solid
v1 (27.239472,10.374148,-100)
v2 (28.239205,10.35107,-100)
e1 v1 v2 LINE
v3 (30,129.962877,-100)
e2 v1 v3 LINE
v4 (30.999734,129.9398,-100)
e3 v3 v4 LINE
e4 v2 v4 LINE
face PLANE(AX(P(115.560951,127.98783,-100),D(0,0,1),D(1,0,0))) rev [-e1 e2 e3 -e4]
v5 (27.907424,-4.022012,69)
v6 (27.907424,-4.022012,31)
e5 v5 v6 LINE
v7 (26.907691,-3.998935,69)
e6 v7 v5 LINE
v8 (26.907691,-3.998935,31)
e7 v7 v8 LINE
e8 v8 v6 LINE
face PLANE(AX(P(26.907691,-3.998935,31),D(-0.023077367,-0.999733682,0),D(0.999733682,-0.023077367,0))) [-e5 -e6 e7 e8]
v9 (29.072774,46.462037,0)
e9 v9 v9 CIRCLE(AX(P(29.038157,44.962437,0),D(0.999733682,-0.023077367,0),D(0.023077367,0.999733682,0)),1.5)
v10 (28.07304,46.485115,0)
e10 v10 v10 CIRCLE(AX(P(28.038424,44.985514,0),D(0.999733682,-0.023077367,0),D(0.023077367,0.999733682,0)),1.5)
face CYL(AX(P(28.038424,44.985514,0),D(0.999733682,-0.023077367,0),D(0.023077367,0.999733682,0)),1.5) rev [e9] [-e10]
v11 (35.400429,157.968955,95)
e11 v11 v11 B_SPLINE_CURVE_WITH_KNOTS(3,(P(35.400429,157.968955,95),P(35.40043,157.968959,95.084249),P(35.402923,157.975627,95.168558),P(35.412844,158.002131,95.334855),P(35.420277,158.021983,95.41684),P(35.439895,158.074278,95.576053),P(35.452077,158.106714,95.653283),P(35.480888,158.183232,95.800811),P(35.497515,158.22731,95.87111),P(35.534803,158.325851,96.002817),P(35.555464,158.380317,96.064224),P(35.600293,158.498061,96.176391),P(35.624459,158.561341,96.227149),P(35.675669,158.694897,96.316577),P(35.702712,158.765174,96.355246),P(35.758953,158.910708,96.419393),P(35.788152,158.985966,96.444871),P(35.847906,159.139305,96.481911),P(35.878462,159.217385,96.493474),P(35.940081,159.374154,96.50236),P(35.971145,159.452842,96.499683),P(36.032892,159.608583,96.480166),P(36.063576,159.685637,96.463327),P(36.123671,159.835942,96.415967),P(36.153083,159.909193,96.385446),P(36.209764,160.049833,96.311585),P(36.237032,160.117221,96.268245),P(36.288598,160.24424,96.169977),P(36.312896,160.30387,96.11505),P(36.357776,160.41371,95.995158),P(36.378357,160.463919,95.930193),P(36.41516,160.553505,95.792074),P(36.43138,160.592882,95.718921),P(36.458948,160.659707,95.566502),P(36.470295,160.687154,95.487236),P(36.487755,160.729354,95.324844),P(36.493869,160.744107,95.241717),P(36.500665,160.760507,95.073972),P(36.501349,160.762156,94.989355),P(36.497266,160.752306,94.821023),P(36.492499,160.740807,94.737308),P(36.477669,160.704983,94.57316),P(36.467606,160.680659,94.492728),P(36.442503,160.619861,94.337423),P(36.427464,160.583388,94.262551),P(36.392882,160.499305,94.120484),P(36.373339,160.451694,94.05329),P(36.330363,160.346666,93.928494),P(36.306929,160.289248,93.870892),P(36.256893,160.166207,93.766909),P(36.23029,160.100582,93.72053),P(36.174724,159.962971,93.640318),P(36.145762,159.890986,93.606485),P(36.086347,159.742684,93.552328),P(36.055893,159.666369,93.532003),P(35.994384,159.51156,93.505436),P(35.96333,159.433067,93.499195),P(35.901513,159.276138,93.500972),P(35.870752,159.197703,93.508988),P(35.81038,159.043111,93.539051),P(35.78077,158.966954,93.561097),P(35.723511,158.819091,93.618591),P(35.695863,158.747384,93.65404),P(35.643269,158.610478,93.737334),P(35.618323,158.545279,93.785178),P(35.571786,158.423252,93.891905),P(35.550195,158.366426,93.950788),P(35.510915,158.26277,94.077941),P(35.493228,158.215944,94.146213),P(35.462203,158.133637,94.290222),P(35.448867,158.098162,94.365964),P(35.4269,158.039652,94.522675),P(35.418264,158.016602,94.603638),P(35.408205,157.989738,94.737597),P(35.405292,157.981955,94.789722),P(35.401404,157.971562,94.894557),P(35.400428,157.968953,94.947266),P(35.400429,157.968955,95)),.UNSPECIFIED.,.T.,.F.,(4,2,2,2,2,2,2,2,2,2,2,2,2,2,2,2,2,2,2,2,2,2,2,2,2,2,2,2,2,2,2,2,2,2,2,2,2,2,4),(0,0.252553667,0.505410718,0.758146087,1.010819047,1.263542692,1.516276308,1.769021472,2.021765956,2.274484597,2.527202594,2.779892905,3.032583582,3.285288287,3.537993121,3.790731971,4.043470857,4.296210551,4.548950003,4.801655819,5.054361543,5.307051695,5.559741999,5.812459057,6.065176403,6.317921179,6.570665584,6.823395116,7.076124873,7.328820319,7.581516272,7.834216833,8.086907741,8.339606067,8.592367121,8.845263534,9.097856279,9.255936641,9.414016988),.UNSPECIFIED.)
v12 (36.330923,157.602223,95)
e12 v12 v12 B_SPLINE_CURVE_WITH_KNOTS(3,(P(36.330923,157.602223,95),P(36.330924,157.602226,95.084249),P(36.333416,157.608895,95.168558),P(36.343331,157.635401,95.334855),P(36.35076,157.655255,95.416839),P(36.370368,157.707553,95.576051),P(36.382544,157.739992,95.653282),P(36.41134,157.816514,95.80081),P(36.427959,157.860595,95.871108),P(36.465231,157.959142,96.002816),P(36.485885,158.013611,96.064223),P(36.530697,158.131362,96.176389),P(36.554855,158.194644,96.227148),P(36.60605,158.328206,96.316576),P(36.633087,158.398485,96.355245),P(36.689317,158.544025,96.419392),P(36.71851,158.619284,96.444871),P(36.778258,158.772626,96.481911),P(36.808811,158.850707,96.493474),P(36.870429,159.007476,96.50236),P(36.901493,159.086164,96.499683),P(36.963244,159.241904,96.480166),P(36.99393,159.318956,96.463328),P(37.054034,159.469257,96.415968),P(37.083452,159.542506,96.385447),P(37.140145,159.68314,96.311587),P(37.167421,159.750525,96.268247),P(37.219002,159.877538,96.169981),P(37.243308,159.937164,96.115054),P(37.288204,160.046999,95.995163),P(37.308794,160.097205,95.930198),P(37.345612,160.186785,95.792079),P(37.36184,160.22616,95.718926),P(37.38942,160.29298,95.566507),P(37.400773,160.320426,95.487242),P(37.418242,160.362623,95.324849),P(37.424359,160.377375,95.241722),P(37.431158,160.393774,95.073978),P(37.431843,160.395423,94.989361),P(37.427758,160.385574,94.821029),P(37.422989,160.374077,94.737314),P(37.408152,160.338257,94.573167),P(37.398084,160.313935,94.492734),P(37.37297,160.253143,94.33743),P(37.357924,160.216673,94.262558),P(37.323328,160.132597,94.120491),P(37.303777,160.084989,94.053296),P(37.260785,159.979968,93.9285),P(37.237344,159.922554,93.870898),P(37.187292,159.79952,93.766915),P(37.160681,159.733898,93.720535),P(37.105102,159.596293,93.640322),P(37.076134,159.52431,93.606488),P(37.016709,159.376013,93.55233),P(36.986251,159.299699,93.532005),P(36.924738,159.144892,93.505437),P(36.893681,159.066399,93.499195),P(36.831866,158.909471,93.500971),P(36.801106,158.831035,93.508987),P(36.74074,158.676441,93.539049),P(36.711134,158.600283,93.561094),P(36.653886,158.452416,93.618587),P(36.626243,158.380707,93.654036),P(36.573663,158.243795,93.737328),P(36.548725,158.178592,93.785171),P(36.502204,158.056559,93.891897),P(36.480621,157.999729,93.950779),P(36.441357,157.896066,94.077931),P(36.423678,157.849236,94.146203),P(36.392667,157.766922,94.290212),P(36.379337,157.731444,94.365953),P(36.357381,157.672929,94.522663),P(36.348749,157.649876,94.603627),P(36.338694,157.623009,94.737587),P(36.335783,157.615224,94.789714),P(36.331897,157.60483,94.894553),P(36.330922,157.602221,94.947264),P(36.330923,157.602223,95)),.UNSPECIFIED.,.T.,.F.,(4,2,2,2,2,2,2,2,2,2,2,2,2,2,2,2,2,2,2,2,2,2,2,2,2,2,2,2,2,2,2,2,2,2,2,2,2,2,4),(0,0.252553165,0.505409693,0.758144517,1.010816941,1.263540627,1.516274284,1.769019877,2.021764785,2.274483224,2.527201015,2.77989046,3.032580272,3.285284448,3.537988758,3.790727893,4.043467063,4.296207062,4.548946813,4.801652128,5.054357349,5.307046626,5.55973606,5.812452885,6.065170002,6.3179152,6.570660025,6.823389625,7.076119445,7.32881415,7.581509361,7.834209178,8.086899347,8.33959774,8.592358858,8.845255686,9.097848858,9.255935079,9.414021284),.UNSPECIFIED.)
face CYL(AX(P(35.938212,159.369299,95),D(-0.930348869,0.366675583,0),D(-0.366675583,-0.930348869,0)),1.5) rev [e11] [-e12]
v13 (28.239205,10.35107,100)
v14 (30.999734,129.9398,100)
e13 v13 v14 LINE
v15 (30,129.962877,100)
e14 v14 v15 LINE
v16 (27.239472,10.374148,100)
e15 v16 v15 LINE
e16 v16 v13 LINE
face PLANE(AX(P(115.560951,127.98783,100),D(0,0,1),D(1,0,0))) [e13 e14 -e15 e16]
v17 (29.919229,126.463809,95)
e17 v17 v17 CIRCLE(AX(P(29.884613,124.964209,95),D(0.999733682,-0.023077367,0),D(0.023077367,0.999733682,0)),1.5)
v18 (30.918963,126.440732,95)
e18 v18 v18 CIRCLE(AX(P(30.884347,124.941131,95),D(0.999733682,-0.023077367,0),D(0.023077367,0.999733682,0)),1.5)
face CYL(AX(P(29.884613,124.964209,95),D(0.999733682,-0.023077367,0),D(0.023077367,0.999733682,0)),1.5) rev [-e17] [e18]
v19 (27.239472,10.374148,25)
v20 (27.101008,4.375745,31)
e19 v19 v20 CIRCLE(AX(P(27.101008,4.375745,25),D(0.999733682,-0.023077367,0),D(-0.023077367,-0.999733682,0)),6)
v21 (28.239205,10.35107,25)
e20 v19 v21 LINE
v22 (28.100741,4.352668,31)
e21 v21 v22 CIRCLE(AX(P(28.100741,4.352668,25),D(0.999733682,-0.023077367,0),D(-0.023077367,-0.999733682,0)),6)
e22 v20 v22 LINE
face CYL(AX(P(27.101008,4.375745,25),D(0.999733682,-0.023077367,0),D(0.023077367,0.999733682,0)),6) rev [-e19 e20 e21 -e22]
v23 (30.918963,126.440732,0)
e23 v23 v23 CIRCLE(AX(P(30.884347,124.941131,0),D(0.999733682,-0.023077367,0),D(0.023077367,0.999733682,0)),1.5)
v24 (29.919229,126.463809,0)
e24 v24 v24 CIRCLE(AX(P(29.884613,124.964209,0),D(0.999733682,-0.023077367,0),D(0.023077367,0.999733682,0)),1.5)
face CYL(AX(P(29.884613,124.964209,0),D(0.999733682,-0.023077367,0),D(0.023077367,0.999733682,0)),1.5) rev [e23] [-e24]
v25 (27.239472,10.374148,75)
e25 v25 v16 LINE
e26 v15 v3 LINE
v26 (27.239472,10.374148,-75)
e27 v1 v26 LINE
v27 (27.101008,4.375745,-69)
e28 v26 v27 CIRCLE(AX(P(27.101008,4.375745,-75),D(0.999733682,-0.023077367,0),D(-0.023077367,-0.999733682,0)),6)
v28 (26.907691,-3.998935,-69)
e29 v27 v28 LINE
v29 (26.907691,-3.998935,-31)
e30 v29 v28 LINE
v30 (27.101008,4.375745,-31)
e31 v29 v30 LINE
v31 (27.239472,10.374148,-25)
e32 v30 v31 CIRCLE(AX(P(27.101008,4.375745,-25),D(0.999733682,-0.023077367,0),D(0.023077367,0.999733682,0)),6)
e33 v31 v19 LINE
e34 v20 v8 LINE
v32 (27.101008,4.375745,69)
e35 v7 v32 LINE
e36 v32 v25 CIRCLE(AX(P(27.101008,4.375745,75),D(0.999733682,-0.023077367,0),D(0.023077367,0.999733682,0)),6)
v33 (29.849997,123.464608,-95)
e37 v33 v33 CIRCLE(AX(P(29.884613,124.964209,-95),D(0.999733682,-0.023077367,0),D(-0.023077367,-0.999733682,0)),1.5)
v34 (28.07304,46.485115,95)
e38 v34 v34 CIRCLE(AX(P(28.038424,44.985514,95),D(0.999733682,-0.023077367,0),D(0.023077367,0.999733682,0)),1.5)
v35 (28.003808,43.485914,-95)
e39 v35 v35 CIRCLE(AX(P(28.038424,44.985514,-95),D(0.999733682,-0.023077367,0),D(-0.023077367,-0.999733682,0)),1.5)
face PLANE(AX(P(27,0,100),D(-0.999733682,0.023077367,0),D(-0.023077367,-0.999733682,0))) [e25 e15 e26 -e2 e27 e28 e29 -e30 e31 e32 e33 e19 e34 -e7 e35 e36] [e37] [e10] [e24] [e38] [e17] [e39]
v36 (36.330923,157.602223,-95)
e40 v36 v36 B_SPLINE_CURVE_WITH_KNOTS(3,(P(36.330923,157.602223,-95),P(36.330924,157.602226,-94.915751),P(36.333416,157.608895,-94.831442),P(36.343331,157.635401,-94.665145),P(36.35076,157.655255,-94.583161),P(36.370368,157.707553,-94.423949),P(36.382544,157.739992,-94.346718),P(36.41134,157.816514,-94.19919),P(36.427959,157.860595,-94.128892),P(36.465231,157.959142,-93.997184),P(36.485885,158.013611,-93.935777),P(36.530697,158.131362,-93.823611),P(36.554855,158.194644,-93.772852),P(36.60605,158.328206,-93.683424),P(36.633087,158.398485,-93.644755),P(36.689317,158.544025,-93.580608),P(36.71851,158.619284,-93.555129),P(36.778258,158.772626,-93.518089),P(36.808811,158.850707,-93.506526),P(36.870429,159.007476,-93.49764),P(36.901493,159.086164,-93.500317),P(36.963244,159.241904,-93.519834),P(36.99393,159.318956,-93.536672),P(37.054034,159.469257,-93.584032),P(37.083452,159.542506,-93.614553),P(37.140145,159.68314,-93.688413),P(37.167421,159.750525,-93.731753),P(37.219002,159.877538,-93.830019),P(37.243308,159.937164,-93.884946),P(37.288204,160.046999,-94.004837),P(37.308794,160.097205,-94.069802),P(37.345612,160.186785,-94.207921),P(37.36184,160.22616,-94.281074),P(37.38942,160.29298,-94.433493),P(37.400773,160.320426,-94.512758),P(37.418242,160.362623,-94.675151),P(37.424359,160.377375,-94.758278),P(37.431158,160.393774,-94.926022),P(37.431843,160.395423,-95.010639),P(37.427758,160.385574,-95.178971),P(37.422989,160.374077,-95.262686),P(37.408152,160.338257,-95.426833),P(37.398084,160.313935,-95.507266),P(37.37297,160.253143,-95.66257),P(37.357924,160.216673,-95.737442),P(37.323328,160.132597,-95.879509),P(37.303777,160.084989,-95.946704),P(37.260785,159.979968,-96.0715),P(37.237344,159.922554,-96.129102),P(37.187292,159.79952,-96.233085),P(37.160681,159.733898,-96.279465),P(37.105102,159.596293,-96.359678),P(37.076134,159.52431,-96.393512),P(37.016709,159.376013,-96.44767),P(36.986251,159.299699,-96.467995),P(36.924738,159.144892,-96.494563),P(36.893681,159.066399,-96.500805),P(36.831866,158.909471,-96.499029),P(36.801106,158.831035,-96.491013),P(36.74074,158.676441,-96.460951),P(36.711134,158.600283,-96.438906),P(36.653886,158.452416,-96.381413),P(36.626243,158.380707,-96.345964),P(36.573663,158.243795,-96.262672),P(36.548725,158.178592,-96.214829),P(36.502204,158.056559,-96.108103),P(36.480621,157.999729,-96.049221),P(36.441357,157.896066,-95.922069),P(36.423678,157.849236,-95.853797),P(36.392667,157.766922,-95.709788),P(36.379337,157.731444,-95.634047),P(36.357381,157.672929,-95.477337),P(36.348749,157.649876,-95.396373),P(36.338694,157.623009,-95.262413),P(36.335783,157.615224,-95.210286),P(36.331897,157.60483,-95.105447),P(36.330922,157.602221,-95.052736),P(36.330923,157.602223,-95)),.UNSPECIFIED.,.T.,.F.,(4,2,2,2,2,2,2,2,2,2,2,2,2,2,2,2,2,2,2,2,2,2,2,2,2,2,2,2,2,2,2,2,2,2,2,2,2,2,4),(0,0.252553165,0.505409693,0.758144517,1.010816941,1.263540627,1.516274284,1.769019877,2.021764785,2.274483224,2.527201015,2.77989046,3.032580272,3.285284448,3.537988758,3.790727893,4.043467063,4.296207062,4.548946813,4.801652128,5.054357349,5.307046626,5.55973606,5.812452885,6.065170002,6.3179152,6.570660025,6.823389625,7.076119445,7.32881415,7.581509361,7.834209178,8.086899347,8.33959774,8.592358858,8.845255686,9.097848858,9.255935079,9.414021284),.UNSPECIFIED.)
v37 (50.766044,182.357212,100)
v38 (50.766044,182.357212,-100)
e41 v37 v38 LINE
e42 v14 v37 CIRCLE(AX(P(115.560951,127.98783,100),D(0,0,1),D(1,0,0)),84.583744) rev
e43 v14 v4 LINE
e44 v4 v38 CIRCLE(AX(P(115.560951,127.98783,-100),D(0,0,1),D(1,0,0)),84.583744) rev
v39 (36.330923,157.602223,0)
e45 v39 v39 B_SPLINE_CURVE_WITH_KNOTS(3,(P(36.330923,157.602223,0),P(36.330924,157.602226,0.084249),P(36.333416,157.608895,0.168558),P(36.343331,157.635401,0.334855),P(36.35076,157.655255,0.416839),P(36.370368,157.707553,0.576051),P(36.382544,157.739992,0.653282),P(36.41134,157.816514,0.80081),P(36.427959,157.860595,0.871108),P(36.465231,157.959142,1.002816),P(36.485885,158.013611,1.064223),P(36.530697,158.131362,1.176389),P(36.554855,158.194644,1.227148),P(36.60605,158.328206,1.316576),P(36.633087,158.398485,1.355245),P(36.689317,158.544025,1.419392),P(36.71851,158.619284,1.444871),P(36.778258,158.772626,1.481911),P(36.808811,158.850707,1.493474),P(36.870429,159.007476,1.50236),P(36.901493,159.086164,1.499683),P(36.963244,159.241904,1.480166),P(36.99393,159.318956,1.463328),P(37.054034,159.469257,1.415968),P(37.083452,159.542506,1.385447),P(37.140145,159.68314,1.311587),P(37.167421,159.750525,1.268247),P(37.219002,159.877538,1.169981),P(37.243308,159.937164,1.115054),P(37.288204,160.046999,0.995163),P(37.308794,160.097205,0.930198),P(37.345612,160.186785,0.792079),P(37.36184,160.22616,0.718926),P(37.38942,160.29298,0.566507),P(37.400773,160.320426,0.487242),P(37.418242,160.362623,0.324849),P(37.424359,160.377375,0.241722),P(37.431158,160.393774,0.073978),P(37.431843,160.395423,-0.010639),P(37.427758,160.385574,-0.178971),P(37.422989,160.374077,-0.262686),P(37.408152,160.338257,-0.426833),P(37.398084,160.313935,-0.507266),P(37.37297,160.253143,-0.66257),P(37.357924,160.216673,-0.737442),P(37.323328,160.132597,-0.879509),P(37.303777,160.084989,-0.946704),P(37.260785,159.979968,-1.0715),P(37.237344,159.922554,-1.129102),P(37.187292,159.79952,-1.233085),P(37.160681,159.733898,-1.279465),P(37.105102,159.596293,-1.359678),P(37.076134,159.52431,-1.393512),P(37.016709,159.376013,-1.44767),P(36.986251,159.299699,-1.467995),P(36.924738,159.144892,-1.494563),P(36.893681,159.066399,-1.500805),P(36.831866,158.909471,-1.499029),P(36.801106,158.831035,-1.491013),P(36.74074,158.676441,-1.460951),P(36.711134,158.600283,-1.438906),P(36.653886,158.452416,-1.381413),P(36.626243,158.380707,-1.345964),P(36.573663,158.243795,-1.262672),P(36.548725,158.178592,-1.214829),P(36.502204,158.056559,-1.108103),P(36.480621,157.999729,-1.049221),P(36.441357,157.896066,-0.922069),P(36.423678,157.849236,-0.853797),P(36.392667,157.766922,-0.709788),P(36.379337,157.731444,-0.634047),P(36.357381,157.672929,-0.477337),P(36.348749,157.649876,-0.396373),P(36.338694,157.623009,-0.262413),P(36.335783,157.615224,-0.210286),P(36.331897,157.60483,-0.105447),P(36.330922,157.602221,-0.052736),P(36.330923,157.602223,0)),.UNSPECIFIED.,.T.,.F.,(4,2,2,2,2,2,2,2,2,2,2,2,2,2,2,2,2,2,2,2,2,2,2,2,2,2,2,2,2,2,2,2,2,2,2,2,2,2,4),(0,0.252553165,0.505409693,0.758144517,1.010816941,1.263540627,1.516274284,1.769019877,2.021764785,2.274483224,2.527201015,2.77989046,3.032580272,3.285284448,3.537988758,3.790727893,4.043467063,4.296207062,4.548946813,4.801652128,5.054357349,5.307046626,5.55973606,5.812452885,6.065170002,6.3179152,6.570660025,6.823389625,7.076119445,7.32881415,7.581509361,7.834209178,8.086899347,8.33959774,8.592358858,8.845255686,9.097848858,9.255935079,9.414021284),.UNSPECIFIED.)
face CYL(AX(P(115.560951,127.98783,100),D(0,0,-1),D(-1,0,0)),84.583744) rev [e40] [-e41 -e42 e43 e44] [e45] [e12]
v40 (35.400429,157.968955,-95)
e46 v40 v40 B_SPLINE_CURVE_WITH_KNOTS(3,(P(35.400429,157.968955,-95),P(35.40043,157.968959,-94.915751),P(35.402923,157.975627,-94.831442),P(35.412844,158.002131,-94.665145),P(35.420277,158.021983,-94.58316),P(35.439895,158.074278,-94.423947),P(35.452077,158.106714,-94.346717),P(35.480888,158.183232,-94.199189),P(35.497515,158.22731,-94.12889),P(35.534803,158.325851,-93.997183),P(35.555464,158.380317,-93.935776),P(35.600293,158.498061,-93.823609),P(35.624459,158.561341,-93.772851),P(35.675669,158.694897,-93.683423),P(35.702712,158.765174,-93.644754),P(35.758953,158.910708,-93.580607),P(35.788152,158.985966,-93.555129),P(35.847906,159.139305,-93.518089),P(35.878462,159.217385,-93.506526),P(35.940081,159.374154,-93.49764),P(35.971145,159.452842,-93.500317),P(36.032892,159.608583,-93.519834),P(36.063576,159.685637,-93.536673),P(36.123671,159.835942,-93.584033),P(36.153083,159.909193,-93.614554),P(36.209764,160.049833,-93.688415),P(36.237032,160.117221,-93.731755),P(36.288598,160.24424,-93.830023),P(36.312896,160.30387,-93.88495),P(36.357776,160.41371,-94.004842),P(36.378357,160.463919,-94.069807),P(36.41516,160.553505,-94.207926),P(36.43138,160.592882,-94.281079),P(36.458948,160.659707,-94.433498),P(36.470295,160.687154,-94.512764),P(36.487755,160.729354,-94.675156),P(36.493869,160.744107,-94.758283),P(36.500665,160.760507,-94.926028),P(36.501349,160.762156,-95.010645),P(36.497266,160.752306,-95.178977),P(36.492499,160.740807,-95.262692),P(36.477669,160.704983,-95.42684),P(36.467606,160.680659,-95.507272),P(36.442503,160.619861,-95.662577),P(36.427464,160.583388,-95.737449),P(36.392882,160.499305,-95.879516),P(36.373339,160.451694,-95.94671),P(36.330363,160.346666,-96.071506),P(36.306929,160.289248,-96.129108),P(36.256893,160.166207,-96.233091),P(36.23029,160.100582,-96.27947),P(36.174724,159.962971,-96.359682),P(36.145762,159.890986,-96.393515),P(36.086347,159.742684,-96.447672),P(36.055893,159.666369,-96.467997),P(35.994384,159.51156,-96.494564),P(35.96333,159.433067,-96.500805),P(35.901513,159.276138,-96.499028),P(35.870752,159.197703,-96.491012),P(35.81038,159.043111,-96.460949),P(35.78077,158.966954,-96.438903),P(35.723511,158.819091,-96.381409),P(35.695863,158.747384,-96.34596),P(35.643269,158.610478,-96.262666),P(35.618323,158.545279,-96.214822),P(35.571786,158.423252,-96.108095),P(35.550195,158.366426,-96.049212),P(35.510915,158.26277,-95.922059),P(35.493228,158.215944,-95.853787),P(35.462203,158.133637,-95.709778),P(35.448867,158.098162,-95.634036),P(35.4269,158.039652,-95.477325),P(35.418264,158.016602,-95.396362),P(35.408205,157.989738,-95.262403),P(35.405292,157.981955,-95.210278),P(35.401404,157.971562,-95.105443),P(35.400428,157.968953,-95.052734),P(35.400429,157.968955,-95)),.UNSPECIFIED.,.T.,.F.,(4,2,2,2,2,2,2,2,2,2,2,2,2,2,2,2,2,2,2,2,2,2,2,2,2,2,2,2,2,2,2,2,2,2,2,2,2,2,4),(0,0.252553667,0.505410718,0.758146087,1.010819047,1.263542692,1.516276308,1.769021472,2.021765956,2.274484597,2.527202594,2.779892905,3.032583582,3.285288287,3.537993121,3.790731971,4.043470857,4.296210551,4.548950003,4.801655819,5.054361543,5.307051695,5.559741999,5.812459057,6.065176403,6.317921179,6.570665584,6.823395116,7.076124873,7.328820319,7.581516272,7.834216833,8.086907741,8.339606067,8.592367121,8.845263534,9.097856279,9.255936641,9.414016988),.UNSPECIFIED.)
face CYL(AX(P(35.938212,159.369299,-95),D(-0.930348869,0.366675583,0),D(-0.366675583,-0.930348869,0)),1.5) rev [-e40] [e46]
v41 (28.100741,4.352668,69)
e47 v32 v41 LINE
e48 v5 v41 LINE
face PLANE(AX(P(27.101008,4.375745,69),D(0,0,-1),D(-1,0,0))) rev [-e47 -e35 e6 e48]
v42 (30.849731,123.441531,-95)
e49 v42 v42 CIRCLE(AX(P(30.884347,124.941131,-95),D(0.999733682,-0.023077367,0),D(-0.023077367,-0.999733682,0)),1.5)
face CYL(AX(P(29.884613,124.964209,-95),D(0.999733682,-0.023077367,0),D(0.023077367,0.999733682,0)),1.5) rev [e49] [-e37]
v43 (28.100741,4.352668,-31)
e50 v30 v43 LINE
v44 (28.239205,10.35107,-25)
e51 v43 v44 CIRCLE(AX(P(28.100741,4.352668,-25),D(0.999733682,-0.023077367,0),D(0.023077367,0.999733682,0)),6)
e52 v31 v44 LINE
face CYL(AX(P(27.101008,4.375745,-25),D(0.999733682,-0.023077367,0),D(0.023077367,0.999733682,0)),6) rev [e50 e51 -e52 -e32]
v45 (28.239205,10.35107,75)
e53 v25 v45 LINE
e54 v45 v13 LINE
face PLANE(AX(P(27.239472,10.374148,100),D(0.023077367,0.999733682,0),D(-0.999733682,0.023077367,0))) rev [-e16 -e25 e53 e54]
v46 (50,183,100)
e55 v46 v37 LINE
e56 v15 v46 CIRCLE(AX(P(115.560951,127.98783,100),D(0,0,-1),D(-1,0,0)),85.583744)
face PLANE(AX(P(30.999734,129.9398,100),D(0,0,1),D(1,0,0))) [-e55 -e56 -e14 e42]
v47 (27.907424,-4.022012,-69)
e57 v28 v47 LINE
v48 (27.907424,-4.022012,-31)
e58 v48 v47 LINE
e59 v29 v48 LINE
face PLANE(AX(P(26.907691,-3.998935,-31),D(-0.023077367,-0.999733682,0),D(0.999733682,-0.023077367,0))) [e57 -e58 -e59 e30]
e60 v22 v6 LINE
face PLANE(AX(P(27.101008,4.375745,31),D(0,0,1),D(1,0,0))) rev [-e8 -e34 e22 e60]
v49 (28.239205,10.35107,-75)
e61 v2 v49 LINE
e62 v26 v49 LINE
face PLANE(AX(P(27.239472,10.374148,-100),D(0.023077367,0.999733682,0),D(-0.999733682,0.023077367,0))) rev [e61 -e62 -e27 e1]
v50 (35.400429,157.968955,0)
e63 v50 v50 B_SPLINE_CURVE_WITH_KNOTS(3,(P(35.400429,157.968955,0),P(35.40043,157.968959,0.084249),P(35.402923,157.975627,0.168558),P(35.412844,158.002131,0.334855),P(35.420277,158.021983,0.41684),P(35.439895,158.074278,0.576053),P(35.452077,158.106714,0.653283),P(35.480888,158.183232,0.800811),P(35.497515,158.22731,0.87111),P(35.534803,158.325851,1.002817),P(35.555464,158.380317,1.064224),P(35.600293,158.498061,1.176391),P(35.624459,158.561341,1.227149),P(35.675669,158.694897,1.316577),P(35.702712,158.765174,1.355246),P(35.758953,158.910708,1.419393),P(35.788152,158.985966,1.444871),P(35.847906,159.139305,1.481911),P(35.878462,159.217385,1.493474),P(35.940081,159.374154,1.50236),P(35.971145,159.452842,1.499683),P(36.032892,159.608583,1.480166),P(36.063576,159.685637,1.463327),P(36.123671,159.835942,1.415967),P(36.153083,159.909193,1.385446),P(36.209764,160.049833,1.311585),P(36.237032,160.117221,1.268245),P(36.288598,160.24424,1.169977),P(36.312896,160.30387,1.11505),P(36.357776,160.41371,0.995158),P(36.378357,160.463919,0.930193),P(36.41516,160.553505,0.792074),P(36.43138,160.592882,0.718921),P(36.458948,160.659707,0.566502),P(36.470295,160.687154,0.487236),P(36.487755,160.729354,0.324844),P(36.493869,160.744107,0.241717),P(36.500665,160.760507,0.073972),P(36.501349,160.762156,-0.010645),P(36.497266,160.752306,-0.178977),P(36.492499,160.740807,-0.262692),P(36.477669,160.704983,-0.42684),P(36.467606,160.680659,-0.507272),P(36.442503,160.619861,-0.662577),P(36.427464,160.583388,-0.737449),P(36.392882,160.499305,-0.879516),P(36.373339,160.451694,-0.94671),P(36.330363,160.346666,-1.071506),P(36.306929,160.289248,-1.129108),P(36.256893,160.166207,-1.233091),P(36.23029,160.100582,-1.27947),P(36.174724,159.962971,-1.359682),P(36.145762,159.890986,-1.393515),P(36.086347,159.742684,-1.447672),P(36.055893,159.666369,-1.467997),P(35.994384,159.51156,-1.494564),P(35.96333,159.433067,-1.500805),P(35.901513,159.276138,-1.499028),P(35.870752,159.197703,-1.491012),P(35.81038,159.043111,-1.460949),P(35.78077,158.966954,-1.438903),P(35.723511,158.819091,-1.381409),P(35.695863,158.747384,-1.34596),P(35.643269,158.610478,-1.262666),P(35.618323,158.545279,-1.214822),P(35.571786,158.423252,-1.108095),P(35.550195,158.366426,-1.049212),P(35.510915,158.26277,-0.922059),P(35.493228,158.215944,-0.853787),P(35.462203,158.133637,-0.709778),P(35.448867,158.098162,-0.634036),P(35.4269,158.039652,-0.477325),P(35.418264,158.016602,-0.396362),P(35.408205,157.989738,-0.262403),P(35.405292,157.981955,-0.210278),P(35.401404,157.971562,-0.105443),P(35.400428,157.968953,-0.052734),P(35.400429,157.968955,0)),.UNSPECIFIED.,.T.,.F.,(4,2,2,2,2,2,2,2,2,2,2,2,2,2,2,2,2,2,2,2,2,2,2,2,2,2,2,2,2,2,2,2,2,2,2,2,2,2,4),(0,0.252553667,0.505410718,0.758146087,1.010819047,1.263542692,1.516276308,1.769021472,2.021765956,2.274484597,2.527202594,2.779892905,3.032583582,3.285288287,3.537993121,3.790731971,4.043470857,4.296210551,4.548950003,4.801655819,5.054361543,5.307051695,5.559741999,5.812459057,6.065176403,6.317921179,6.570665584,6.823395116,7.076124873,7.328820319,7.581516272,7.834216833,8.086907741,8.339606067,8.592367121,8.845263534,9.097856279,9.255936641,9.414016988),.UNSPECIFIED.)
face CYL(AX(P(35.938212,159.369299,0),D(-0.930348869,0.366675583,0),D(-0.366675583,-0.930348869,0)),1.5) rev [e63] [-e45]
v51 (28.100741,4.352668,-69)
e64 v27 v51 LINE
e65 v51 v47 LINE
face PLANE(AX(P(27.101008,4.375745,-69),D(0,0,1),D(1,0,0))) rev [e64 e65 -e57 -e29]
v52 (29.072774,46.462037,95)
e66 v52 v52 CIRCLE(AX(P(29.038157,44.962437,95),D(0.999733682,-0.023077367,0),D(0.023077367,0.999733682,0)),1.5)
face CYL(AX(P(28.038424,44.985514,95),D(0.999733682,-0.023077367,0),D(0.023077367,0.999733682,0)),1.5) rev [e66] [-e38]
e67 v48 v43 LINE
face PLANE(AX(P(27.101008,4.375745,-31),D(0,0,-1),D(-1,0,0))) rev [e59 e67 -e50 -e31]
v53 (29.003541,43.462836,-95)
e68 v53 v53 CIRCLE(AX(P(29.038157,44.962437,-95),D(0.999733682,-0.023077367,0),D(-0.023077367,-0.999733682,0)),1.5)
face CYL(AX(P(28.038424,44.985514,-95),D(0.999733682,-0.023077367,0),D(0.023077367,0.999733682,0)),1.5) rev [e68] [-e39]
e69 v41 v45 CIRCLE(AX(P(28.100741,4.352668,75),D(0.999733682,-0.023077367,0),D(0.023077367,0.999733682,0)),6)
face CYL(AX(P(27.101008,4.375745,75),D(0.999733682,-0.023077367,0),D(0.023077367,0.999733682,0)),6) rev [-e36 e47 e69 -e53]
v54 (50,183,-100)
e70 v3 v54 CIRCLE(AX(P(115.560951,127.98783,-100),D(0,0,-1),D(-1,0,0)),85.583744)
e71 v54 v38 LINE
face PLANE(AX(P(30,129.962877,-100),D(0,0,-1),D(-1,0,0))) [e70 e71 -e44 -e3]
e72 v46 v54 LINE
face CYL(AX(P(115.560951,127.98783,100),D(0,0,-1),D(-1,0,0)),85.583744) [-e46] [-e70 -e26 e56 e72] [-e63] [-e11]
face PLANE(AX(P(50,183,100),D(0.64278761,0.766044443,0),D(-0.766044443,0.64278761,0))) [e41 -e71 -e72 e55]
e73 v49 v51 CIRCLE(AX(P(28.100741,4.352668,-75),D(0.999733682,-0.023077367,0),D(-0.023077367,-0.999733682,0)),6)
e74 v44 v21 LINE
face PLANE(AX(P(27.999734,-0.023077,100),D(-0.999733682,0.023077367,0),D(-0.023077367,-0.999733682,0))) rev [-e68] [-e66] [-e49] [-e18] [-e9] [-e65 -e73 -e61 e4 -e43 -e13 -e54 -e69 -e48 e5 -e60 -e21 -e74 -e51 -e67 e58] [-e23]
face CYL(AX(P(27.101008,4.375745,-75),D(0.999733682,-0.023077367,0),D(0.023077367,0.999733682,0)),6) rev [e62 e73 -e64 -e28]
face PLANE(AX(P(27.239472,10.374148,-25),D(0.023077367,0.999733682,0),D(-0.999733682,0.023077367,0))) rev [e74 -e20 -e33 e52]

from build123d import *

# Parameters (mm, degrees)
T_LE_DE_BASE_PLI_E1_DEPTH               = 100
ESQUISSE9_R                             = 1.5
ENL_V_MAT_EXTRU_1_DEPTH                 = 1
ESQUISSE6_W                             = 38
ESQUISSE6_H                             = 4
PATTE1_DEPTH                            = 1
DIAM_TRE_DU_PER_AGE_3_0_3_1_D           = 3
DIAM_TRE_DU_PER_AGE_3_0_3_1_ON_FACE_2_D = 3


# Sheet-metal steps are written as plain solids
with BuildPart() as part:
    # Esquisse1 → Tôle de base pliée1 (new, symmetric)
    with BuildSketch(Plane.XY):
        with BuildLine():
            Line((27, 0), (30, 129.962877268))
            ThreePointArc((30, 129.962877268), (35.481668982, 158.18527579), (50, 183))
            Line((50, 183), (50.766044443, 182.35721239))
            ThreePointArc((50.766044443, 182.35721239), (36.417352312, 157.832434881), (30.999733682, 129.939799901))
            Line((30.999733682, 129.939799901), (27.999733682, -0.023077367))
            Line((27.999733682, -0.023077367), (27, 0))
        make_face()
    extrude(amount=T_LE_DE_BASE_PLI_E1_DEPTH, both=True)

    # Esquisse9 → Enlèv. mat.-Extru.1 (cut)
    with BuildSketch(Plane(origin=(27.98535443, -0.646000343, 0), x_dir=(0, 0, -1), z_dir=(0.9997336820980194, -0.02307736724014006, 0))):
        with Locations(Location((-95, 45.620586844, 0), (0, 0, 90))):
            Circle(ESQUISSE9_R)
        with Locations(Location((-95, 125.620586844, 0), (0, 0, 90))):
            Circle(ESQUISSE9_R)
        with Locations(Location((0, 125.620586844, 0), (0, 0, 90))):
            Circle(ESQUISSE9_R)
        with Locations(Location((0, 45.620586844, 0), (0, 0, 90))):
            Circle(ESQUISSE9_R)
        with Locations(Location((95, 45.620586844, 0), (0, 0, 270))):
            Circle(ESQUISSE9_R)
        with Locations(Location((95, 125.620586844, 0), (0, 0, 270))):
            Circle(ESQUISSE9_R)
        with BuildLine():
            Line((-69, 5), (-69, 0.623088915))
            Line((-69, 0.623088915), (-100, 0.623088915))
            Line((-100, 0.623088915), (-100, 11))
            Line((-100, 11), (-75, 11))
            ThreePointArc((-75, 11), (-70.757359313, 9.242640687), (-69, 5))
        make_face()
        with BuildLine():
            Line((25, 11), (-25, 11))
            ThreePointArc((-25, 11), (-29.242640687, 9.242640687), (-31, 5))
            Line((-31, 5), (-31, 0.623088915))
            Line((-31, 0.623088915), (31, 0.623088915))
            Line((31, 0.623088915), (31, 5))
            ThreePointArc((31, 5), (29.242640687, 9.242640687), (25, 11))
        make_face()
        with BuildLine():
            Line((100, 11), (75, 11))
            ThreePointArc((75, 11), (70.757359313, 9.242640687), (69, 5))
            Line((69, 5), (69, 0.623088915))
            Line((69, 0.623088915), (100, 0.623088915))
            Line((100, 0.623088915), (100, 11))
        make_face()
    extrude(amount=-ENL_V_MAT_EXTRU_1_DEPTH, mode=Mode.SUBTRACT)

    # Esquisse6 → Patte1 (add)
    with BuildSketch(Plane(origin=(27.98535443, -0.646000343, 0), x_dir=(0, 0, -1), z_dir=(0.9997336820980194, -0.02307736724014006, 0))):
        with Locations((-50, -1.376911085)):
            Rectangle(ESQUISSE6_W, ESQUISSE6_H)
        with Locations((50, -1.376911085)):
            Rectangle(ESQUISSE6_W, ESQUISSE6_H)
    extrude(amount=-PATTE1_DEPTH)

    # Diamètre du perçage Ø3.0 (3)1 (through all)
    with Locations(Plane(origin=(35.938212122, 159.369298961, -95), x_dir=(-0.366675582569, -0.930348868515, 0), z_dir=(-0.930348868515, 0.366675582569, 0))):
        with Locations((0, 0)):
            Hole(DIAM_TRE_DU_PER_AGE_3_0_3_1_D / 2)

    # Diamètre du perçage Ø3.0 (3)1 on face 2 (through all)
    with Locations(Plane(origin=(35.938212122, 159.369298961, 0), x_dir=(-0.366675899022, -0.930348743793, 0), z_dir=(-0.930348743793, 0.366675899022, 0))):
        with Locations((0, 0), (0, 95)):
            Hole(DIAM_TRE_DU_PER_AGE_3_0_3_1_ON_FACE_2_D / 2)


solid = part.part
